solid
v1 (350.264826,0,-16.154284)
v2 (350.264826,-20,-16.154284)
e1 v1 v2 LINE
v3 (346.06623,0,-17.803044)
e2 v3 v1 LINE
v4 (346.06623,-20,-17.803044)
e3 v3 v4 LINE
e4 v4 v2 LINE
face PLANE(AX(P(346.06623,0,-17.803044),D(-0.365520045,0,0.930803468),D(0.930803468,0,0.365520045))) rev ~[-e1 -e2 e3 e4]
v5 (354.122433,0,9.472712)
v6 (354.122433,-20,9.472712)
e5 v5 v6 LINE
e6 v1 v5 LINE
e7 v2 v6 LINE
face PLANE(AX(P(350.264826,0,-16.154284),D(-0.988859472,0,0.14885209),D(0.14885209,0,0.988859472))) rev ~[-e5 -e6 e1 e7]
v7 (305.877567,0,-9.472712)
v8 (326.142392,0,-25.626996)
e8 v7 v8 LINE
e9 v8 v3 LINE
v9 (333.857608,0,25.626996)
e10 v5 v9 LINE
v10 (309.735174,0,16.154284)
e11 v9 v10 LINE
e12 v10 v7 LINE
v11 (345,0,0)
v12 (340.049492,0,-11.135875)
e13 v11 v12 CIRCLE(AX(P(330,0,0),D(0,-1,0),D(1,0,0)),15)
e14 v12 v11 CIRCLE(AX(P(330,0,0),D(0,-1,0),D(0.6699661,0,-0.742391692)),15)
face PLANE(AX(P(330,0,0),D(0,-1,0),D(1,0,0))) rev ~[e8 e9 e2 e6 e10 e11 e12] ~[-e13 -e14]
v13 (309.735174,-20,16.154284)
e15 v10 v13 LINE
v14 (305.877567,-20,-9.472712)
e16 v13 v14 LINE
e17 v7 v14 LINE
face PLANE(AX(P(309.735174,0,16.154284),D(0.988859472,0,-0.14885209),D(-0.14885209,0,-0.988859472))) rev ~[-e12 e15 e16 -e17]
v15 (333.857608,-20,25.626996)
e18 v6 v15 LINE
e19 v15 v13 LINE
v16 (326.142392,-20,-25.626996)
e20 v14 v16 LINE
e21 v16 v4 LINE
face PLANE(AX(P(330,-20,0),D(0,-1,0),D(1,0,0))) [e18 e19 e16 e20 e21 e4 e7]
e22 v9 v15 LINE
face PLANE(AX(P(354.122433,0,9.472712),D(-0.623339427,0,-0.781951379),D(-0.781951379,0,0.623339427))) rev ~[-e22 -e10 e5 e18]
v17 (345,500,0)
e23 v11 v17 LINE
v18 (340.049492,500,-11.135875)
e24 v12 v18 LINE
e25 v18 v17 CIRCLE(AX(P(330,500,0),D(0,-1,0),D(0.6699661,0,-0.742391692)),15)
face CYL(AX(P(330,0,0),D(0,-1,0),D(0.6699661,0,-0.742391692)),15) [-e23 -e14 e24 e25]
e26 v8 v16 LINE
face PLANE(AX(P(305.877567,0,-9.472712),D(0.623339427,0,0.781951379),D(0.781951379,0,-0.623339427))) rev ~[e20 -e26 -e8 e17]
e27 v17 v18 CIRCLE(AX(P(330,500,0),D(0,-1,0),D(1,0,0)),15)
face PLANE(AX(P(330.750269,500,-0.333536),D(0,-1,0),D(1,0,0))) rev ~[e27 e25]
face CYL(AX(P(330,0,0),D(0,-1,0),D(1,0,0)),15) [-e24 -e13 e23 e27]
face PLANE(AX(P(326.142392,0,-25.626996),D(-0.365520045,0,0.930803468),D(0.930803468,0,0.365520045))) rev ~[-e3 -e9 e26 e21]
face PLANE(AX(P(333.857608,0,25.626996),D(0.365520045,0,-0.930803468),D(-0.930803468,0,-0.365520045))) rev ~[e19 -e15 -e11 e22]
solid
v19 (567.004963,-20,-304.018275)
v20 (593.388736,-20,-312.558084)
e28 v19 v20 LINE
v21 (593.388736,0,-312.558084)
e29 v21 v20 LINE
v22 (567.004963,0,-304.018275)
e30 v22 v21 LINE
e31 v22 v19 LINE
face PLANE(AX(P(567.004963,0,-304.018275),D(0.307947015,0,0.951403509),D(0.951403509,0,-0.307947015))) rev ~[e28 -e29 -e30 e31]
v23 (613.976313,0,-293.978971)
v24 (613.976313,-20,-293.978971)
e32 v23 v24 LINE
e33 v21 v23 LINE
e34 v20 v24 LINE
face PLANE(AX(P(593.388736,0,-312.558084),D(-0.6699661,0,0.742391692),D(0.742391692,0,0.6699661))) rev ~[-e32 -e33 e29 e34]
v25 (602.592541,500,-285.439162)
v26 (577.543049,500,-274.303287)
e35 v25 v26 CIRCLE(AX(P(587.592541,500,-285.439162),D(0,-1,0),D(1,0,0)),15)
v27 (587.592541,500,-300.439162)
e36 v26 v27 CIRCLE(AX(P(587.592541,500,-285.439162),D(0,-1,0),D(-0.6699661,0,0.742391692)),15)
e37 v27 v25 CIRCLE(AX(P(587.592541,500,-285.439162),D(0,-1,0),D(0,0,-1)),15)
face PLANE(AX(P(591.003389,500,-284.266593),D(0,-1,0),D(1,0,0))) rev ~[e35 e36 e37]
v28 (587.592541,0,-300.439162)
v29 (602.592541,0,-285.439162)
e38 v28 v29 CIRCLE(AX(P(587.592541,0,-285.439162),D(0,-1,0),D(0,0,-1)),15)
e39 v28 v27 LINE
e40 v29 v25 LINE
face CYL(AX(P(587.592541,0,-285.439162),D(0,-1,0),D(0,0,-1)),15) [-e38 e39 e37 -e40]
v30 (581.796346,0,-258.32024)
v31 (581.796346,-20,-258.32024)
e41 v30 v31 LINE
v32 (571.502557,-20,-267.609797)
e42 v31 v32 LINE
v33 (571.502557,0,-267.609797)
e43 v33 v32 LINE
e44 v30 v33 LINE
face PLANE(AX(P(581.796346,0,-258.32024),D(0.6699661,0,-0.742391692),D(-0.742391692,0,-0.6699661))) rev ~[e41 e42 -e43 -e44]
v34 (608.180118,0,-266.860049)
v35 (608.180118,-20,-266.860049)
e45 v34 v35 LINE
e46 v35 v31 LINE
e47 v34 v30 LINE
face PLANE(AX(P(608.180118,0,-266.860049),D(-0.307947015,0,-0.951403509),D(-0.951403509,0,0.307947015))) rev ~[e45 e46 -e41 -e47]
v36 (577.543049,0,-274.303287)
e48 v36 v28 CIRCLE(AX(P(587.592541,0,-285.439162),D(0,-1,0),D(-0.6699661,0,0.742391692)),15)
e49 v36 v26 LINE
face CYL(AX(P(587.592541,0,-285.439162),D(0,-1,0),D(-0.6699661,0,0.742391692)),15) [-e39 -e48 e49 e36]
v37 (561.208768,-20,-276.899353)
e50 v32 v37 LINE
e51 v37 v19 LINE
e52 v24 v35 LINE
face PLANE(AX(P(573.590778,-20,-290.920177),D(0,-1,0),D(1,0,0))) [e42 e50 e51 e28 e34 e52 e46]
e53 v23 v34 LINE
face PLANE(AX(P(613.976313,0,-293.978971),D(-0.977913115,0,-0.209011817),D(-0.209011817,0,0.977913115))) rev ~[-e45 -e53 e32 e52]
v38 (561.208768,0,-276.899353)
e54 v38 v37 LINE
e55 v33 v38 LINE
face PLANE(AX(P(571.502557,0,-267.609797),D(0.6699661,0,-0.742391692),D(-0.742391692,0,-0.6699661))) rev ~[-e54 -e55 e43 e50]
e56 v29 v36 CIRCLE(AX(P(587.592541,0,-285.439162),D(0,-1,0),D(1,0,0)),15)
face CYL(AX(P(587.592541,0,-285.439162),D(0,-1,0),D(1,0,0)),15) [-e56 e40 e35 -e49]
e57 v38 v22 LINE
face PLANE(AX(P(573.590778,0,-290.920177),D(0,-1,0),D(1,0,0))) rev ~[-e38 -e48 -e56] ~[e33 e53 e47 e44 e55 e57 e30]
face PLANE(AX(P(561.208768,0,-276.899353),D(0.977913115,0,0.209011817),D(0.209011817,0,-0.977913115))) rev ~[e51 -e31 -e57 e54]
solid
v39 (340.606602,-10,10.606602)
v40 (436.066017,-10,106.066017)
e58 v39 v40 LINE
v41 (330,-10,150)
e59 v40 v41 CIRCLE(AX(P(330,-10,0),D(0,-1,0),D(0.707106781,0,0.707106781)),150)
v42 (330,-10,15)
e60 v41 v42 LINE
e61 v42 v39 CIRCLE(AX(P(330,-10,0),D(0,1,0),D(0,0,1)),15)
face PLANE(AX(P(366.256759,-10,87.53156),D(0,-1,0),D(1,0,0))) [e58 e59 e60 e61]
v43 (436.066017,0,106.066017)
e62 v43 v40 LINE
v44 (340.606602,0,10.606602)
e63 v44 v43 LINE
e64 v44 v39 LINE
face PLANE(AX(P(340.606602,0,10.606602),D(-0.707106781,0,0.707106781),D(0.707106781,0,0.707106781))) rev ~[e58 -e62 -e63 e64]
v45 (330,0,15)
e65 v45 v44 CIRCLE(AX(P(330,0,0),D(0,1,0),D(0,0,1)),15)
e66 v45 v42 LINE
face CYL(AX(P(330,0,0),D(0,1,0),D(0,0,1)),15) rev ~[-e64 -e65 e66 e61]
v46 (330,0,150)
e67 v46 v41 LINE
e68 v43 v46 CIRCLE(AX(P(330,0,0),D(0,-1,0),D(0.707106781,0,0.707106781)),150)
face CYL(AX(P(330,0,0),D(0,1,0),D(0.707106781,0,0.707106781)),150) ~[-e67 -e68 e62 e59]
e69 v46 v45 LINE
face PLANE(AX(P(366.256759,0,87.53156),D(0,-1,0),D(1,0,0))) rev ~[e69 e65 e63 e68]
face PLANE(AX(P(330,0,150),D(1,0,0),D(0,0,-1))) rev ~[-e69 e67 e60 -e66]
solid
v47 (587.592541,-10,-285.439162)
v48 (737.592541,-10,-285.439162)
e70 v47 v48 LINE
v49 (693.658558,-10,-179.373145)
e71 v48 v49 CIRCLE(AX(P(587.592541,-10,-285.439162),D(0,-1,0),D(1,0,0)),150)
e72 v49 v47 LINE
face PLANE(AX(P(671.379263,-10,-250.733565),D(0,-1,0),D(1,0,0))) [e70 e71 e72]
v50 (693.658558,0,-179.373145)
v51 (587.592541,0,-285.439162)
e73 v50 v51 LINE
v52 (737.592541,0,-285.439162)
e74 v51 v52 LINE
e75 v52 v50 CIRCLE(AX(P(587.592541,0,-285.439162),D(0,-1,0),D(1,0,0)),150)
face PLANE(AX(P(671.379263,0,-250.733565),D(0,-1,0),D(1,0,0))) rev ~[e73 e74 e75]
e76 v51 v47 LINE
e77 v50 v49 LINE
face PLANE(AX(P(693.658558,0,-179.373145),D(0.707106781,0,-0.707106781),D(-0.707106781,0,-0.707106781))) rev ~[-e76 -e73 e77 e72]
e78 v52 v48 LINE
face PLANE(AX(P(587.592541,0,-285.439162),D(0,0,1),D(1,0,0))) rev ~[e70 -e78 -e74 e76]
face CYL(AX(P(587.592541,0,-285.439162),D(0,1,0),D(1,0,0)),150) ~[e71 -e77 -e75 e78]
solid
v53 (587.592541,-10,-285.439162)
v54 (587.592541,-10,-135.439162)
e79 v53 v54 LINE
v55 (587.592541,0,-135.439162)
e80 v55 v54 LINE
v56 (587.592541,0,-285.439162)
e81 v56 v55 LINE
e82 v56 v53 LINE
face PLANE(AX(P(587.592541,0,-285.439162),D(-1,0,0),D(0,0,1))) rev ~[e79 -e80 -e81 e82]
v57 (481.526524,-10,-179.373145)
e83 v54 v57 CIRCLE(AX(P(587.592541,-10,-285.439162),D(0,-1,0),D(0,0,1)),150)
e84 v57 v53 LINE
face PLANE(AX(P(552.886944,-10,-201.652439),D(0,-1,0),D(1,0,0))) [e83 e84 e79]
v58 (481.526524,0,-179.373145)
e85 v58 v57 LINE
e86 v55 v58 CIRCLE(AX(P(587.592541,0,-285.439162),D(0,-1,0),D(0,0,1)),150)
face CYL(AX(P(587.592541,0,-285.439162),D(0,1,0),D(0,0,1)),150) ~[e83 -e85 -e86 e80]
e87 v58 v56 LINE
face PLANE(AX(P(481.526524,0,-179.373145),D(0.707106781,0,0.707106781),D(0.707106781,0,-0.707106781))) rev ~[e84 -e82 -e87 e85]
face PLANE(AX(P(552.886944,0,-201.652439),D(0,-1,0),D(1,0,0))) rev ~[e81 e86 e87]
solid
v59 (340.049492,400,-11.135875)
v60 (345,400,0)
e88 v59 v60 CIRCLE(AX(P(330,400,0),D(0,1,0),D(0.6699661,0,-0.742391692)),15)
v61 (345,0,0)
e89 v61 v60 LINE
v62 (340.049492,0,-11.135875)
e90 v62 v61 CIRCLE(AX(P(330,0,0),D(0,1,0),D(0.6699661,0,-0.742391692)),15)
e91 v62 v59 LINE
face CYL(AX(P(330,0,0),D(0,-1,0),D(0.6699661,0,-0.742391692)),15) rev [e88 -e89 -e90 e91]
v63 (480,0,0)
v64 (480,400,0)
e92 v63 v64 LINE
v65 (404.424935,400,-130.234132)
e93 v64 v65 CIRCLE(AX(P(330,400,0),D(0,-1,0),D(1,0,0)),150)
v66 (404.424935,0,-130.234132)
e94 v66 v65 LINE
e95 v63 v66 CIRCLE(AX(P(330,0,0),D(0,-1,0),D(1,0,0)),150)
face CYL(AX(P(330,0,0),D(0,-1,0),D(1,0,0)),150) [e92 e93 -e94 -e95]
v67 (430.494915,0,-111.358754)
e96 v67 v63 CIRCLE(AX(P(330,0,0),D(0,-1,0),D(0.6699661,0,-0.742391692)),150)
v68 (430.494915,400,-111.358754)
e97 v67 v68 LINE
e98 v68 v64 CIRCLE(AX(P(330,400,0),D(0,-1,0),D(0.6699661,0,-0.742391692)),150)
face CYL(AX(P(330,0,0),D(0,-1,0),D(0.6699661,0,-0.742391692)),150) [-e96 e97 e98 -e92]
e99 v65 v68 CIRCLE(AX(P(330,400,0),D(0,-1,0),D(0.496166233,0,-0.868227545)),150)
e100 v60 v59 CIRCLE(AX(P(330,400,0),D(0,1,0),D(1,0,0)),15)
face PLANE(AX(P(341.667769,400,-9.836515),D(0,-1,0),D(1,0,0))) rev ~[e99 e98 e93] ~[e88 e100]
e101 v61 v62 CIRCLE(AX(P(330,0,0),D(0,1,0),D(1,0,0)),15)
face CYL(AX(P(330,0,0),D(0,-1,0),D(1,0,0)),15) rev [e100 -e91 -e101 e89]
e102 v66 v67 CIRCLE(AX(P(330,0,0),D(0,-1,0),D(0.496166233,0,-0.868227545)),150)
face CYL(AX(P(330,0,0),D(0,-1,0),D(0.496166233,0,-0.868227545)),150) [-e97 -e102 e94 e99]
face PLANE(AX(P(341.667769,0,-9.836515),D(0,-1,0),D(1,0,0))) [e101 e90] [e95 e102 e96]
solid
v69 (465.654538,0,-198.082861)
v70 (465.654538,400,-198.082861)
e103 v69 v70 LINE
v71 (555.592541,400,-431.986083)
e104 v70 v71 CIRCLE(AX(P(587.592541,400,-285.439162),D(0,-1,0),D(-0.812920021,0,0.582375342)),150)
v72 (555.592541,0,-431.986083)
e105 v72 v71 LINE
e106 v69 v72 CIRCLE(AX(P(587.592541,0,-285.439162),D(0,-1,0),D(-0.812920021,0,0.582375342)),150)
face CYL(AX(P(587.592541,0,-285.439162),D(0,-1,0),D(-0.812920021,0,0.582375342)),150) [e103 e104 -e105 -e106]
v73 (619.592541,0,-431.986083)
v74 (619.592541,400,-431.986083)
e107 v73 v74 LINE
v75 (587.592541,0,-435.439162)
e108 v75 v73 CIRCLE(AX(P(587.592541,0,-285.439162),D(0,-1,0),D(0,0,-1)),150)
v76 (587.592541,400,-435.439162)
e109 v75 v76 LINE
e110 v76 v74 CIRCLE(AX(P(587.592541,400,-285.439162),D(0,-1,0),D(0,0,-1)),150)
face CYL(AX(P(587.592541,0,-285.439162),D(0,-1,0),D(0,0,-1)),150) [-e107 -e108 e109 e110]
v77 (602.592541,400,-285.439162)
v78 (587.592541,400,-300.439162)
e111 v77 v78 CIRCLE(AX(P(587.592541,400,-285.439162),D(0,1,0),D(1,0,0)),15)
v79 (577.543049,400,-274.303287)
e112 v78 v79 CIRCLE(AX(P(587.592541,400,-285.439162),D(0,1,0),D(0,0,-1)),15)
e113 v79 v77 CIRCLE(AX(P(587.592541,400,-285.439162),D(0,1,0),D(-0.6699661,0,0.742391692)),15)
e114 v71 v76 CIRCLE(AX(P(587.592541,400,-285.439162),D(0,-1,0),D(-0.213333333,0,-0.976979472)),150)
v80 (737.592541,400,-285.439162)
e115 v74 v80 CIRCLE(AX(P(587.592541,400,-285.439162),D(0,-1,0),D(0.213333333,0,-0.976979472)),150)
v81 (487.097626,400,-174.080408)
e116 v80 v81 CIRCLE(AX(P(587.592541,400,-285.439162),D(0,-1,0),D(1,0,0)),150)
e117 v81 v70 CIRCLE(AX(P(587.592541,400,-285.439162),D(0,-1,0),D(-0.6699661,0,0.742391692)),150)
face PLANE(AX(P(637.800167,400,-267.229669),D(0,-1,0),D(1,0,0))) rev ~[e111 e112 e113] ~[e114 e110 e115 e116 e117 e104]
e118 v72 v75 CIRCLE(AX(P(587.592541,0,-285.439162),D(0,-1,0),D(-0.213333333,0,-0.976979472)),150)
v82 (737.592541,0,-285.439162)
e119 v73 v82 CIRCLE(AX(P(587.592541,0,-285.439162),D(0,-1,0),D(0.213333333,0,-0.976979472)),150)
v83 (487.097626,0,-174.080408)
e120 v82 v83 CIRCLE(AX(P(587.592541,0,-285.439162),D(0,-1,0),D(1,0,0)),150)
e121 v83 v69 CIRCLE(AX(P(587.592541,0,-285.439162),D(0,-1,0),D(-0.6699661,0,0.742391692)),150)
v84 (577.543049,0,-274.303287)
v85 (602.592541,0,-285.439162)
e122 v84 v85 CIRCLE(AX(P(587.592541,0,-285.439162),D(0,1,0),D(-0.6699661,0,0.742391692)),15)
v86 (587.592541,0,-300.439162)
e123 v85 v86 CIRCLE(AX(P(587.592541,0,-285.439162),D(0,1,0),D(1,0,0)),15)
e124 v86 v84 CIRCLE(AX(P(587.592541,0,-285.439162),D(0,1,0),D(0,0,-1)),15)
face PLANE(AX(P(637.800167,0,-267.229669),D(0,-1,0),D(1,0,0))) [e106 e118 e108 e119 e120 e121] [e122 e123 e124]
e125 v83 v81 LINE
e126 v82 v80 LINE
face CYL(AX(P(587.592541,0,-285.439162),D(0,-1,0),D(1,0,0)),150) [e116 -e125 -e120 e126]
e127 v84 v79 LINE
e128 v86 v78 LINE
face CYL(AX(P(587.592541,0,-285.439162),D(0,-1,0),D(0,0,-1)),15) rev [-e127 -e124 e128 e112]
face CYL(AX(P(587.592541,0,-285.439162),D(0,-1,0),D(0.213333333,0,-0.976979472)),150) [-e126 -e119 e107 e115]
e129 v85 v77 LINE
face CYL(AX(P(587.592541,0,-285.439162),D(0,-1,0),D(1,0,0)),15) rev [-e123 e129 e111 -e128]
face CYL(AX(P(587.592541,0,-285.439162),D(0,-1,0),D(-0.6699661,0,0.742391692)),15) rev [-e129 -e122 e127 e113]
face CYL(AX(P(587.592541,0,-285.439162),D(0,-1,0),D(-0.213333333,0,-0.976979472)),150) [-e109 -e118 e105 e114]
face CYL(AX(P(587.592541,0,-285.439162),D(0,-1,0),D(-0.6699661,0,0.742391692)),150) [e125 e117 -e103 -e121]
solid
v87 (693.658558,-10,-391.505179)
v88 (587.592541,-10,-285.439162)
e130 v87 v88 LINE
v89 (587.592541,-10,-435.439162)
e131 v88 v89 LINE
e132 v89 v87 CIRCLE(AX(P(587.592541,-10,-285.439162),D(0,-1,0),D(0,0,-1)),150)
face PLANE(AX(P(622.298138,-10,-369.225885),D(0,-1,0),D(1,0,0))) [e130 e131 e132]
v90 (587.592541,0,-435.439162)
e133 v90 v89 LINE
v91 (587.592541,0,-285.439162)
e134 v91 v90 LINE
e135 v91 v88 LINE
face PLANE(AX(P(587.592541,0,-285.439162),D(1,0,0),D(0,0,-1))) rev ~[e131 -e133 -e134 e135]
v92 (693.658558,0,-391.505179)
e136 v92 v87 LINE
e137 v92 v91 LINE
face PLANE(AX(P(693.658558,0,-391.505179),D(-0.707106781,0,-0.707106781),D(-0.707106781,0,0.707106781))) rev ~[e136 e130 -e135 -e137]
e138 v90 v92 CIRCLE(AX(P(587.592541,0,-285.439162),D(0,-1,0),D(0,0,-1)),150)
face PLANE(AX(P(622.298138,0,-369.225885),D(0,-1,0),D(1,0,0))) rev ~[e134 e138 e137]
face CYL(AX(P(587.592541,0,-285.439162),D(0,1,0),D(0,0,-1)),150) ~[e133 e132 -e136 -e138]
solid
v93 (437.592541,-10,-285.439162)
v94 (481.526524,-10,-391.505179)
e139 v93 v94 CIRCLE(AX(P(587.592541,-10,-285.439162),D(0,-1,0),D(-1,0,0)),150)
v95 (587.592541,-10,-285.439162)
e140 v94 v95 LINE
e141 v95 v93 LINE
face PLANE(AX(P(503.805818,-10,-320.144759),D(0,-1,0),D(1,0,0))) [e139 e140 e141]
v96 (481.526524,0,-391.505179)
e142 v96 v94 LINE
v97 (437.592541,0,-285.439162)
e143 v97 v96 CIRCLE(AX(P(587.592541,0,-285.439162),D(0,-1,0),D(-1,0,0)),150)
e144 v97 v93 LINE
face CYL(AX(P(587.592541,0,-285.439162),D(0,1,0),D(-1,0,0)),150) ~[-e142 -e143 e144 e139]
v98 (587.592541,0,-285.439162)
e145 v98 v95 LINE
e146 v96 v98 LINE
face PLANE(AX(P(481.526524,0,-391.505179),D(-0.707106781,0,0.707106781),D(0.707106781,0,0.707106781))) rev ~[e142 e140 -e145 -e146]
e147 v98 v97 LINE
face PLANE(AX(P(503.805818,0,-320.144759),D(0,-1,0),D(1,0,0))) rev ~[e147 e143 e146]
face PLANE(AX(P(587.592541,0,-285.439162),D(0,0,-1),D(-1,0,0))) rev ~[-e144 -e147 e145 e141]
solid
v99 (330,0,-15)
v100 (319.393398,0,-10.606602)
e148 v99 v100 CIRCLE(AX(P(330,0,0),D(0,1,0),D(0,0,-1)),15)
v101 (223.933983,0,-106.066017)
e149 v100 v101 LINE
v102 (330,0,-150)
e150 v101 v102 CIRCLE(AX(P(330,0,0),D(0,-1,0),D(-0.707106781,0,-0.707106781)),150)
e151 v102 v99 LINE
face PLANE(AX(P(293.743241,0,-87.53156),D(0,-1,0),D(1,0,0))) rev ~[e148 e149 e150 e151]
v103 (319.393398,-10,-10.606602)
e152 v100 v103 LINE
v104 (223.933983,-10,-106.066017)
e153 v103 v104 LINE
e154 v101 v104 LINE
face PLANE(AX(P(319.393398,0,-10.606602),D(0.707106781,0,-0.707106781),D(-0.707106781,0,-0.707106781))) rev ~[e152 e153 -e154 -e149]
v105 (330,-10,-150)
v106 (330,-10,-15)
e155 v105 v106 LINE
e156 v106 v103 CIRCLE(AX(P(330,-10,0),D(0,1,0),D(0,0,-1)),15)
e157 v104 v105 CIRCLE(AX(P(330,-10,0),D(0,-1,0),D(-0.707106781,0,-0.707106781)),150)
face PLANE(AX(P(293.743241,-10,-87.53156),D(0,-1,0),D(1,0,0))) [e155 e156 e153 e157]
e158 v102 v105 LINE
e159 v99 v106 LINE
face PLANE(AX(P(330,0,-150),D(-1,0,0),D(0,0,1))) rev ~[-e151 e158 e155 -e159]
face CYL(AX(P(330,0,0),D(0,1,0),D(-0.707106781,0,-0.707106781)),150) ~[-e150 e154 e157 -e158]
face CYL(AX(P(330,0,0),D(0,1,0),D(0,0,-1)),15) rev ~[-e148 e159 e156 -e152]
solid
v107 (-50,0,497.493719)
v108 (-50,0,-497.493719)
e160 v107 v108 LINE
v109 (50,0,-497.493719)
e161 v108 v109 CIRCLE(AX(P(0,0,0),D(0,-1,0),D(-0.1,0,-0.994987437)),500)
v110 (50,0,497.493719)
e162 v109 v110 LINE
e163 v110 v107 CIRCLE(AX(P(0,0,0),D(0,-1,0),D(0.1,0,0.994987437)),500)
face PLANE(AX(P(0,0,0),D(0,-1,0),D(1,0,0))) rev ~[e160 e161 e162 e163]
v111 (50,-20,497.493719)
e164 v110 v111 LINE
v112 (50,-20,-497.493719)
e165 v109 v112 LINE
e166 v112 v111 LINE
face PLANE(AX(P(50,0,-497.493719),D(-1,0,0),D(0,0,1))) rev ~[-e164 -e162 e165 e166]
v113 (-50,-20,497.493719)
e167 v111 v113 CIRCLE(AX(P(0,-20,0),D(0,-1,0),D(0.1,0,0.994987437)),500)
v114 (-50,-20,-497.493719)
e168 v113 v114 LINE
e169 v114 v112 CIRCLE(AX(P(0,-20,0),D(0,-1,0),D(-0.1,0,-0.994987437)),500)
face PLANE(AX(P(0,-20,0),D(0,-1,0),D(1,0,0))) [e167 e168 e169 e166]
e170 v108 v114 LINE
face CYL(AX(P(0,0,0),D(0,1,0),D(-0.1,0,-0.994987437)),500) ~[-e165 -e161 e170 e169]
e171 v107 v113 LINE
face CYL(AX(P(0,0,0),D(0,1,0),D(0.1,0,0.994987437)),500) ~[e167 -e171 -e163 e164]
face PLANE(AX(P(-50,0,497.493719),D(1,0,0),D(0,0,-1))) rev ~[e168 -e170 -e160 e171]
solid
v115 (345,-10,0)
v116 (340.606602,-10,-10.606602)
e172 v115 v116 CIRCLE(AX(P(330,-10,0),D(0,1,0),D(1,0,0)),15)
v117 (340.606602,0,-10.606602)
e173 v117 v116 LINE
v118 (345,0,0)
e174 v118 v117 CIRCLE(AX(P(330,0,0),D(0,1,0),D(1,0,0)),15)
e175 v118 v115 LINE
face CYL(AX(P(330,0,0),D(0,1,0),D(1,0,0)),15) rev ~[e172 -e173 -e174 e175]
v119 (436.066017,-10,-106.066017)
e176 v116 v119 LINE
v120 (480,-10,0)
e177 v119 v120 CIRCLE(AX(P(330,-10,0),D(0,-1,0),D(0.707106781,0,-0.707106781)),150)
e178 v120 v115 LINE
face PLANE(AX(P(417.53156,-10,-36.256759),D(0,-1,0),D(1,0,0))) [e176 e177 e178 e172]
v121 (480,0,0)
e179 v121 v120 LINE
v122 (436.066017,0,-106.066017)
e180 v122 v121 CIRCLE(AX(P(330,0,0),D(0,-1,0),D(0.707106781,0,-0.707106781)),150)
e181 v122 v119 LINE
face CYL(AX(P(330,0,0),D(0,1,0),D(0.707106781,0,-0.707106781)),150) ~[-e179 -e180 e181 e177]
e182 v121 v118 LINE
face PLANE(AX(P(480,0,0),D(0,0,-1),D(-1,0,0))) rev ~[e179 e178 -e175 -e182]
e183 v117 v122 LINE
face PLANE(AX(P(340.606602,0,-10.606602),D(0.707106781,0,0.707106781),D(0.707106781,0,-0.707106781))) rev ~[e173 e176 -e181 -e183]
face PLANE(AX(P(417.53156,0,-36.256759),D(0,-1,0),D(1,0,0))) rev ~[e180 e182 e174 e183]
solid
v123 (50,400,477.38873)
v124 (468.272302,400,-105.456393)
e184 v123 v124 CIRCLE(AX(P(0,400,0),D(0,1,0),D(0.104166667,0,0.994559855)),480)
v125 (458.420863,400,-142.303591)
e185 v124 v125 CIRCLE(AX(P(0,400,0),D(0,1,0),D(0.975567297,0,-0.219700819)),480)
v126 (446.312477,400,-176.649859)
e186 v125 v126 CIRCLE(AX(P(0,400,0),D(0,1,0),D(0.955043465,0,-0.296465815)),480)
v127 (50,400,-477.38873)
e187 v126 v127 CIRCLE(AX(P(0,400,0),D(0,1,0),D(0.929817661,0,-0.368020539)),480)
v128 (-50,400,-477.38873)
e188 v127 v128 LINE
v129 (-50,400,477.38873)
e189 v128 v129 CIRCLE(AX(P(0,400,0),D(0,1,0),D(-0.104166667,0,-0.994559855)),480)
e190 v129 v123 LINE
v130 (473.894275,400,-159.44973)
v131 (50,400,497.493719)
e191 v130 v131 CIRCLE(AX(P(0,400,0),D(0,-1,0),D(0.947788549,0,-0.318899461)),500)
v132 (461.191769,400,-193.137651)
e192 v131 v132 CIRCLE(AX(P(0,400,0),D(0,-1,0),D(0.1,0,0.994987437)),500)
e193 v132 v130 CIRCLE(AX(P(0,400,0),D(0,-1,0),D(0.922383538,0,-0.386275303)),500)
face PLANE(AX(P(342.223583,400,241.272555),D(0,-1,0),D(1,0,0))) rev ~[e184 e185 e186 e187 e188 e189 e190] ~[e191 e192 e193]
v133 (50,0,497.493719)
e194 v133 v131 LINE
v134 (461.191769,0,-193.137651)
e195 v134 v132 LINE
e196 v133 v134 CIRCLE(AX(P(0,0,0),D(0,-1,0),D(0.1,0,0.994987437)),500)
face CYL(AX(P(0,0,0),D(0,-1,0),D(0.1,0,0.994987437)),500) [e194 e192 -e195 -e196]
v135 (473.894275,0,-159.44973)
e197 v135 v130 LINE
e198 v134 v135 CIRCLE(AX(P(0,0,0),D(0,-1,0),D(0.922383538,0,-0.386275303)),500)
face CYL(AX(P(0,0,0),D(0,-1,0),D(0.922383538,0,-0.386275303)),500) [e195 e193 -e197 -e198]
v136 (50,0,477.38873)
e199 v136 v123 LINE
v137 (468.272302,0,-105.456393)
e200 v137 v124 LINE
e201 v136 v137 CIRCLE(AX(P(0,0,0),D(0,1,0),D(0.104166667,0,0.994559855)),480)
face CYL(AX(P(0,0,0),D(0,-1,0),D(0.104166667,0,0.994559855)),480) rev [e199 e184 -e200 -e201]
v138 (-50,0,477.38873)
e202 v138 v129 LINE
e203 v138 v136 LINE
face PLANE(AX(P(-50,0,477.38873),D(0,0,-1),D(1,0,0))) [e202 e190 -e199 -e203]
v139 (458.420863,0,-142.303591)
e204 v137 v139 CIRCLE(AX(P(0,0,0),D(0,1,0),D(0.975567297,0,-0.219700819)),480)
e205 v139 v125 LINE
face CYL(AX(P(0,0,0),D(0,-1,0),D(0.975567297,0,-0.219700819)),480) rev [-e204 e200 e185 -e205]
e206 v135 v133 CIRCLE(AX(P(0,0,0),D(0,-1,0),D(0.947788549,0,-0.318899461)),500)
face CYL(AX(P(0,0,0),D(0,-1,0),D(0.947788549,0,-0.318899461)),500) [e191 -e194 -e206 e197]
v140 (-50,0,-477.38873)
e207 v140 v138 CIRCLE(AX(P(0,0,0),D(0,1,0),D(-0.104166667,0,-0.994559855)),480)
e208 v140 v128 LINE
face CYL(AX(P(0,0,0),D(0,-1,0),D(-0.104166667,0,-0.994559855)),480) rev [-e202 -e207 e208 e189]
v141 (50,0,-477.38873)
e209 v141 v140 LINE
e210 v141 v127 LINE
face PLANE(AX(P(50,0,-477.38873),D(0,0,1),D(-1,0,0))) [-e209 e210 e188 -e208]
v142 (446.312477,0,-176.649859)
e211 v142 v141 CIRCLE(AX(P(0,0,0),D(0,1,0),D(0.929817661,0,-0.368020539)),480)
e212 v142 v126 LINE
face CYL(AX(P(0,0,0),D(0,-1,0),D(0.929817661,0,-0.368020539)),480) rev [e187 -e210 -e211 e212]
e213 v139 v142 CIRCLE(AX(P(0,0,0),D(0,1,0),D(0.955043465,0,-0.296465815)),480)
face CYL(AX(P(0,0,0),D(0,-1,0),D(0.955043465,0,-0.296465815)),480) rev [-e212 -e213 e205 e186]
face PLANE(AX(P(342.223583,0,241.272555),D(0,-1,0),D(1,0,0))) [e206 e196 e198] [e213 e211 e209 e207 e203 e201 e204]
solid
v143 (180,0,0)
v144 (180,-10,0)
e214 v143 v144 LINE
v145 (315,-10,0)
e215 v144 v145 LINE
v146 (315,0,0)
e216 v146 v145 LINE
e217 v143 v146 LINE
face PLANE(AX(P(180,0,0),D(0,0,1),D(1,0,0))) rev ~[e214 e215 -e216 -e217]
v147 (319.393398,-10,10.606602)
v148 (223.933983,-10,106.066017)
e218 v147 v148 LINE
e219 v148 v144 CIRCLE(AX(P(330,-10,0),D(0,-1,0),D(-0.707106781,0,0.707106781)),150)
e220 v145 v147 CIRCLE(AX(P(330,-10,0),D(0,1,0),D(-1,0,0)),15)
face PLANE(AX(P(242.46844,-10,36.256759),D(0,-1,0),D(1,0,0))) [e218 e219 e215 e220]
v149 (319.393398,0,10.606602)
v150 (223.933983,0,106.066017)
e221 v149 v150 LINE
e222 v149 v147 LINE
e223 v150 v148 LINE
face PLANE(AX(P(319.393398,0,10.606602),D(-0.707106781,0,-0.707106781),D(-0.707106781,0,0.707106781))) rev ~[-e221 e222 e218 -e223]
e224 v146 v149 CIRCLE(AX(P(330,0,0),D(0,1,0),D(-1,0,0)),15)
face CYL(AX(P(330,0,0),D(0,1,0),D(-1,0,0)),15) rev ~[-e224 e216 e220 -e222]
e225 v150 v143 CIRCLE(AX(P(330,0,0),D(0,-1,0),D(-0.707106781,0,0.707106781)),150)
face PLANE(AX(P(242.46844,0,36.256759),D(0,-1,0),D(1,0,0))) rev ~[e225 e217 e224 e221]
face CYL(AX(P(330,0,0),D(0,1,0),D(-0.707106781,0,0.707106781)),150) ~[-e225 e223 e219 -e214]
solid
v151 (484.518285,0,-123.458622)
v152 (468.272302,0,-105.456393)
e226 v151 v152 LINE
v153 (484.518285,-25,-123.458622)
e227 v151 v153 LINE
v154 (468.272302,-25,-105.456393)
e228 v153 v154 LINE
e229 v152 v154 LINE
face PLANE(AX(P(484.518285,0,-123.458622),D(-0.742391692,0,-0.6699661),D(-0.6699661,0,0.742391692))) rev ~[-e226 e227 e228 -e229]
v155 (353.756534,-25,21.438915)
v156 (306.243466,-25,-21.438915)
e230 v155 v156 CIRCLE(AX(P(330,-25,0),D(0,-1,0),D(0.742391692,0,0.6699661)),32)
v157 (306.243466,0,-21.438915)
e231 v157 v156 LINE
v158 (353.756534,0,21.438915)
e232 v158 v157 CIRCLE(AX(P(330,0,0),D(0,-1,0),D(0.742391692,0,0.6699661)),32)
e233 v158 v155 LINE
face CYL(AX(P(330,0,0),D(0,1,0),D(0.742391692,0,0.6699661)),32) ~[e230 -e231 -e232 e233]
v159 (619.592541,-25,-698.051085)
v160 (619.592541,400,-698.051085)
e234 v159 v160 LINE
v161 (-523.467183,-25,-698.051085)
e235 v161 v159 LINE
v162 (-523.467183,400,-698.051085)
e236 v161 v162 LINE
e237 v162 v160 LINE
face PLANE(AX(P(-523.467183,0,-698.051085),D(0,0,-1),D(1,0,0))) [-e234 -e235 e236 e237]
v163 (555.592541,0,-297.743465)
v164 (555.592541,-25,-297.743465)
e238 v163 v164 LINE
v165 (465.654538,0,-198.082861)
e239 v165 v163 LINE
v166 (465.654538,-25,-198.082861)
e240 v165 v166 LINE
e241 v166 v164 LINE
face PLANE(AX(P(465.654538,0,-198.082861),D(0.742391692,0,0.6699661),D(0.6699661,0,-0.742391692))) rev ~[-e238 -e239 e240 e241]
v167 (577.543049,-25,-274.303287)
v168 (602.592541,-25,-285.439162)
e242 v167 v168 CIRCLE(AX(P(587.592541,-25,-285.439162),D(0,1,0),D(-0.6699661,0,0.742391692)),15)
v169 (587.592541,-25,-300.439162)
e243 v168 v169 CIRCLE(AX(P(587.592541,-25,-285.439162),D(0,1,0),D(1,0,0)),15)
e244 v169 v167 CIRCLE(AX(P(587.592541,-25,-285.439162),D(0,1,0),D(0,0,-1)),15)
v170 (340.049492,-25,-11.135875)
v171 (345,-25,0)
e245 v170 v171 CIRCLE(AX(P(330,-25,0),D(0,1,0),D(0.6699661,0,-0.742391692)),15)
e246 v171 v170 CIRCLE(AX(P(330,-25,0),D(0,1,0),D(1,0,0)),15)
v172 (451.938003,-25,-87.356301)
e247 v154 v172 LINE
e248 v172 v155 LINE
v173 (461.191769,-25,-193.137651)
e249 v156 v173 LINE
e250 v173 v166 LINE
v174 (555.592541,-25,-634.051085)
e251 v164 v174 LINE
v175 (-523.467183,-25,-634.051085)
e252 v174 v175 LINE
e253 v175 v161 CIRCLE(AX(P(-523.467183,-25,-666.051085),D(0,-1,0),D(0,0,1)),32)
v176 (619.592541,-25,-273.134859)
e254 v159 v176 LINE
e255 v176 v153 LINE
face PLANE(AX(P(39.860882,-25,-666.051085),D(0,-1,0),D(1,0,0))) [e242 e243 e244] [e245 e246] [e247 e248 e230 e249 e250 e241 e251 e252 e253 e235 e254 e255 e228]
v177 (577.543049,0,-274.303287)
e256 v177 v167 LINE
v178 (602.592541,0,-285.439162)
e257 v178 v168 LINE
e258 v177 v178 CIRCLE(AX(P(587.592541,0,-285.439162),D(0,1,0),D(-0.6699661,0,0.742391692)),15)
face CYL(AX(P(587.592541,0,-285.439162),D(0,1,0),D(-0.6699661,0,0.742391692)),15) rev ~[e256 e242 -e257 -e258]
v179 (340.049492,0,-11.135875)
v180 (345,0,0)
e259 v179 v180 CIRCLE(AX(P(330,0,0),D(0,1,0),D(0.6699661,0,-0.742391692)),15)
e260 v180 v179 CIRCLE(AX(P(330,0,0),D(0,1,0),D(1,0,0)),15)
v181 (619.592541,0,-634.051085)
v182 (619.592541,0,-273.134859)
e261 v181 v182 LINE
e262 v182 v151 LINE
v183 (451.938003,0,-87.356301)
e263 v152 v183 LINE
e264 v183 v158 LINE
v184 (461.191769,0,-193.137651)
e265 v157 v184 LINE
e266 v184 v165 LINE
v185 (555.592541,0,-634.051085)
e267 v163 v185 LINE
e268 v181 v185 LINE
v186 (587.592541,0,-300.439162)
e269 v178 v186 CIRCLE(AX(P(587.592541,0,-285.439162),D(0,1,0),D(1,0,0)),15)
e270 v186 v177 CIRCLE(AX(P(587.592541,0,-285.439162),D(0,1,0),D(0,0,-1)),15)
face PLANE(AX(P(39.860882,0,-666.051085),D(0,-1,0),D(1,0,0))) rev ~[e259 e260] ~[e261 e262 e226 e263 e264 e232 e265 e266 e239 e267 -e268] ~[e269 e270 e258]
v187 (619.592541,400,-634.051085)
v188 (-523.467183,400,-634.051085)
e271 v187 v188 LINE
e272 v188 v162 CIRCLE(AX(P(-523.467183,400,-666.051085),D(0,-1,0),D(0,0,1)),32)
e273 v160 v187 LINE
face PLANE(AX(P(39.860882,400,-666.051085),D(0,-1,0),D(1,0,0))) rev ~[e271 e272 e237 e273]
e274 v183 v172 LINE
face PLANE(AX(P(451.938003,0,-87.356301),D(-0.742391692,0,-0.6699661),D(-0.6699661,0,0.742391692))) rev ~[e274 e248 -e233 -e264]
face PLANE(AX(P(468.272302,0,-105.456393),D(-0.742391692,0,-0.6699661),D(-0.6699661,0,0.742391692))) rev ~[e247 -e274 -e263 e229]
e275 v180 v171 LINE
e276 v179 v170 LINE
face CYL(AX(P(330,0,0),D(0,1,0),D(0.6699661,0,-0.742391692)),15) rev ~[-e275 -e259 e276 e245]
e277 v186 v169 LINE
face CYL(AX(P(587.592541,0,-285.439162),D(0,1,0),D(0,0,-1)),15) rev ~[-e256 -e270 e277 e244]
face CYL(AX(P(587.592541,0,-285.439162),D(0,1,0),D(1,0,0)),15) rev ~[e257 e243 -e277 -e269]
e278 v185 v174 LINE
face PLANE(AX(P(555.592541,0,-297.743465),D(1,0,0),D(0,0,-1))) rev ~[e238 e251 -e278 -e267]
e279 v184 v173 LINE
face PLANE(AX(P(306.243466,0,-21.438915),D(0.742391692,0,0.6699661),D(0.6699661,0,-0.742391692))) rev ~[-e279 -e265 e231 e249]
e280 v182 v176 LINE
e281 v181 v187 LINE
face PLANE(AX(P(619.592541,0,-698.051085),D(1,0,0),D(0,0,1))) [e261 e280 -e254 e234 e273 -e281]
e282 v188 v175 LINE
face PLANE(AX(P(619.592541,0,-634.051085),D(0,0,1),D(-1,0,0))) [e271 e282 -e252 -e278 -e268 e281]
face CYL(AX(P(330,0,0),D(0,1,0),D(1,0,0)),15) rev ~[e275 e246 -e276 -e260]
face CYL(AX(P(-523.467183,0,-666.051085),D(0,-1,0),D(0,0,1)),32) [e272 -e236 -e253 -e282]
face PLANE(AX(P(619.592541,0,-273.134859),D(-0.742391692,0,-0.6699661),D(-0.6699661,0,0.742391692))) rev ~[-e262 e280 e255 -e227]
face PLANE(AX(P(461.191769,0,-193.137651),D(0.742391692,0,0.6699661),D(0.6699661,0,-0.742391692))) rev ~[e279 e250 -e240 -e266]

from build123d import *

# Parameters (mm, degrees)
F1_DEPTH  = 25
F2_DEPTH  = 400
F3_DEPTH  = 20
F4_DEPTH  = 500
F5_DEPTH  = 500
F6_DEPTH  = 400
F7_DEPTH  = 400
F8_DEPTH  = 20
F10_DEPTH = 10


with BuildPart() as f1:
    # F0 (on Front) → F1 (new body)
    with BuildSketch(Plane.XZ):
        with BuildLine():
            Line((619.5925408203, -698.0510845184), (619.5925408203, -634.0510845184))
            Line((619.5925408203, -634.0510845184), (587.5925408203, -634.0510845184))
            Line((587.5925408203, -634.0510845184), (555.5925408203, -634.0510845184))
            Line((555.5925408203, -634.0510845184), (-523.4671831131, -634.0510845184))
            ThreePointArc((-523.4671831131, -634.0510845184), (-555.4671831131, -666.0510845184), (-523.4671831131, -698.0510845184))
            Line((-523.4671831131, -698.0510845184), (619.5925408203, -698.0510845184))
        make_face()
        with BuildLine():
            Line((571.5025570686, -267.6097967695), (487.0976257639, -174.0804081495))
            ThreePointArc((487.0976257639, -174.0804081495), (475.7304372594, -185.5048345789), (465.6545376167, -198.0828606612))
            Line((465.6545376167, -198.0828606612), (555.5925408203, -297.7434648854))
            Line((555.5925408203, -297.7434648854), (555.5925408203, -431.9860827629))
            ThreePointArc((555.5925408203, -431.9860827629), (571.4996560892, -434.5733936367), (587.5925408203, -435.4391619491))
            Line((587.5925408203, -435.4391619491), (587.5925408203, -310.6819911327))
            Line((587.5925408203, -310.6819911327), (567.0049632483, -304.0182748497))
            Line((567.0049632483, -304.0182748497), (561.2087682826, -276.8993532197))
            Line((561.2087682826, -276.8993532197), (571.5025570686, -267.6097967695))
        make_face()
        with BuildLine():
            Line((619.5925408203, -273.1348590129), (513.1676059045, -155.2050302371))
            ThreePointArc((513.1676059045, -155.2050302371), (499.6248851086, -163.9414601248), (487.0976257639, -174.0804081495))
            Line((487.0976257639, -174.0804081495), (571.5025570686, -267.6097967695))
            Line((571.5025570686, -267.6097967695), (581.7963458546, -258.3202403192))
            Line((581.7963458546, -258.3202403192), (608.1801183922, -266.8600490486))
            Line((608.1801183922, -266.8600490486), (613.9763133579, -293.9789706786))
            Line((613.9763133579, -293.9789706786), (593.388735786, -312.5580835791))
            Line((593.388735786, -312.5580835791), (587.5925408203, -310.6819911327))
            Line((587.5925408203, -310.6819911327), (587.5925408203, -435.4391619491))
            ThreePointArc((587.5925408203, -435.4391619491), (603.6854255513, -434.5733936367), (619.5925408203, -431.9860827629))
            Line((619.5925408203, -431.9860827629), (619.5925408203, -273.1348590129))
        make_face()
        with BuildLine():
            Line((487.0976257639, -174.0804081495), (473.8942746161, -159.4497302791))
            ThreePointArc((473.8942746161, -159.4497302791), (467.8463381744, -176.4080606343), (461.1917687716, -193.1376514751))
            Line((461.1917687716, -193.1376514751), (465.6545376167, -198.0828606612))
            ThreePointArc((465.6545376167, -198.0828606612), (475.7304372594, -185.5048345789), (487.0976257639, -174.0804081495))
        make_face()
        with BuildLine():
            ThreePointArc((461.1917687716, -193.1376514751), (467.8463381744, -176.4080606343), (473.8942746161, -159.4497302791))
            Line((473.8942746161, -159.4497302791), (458.4208633436, -142.3035911399))
            ThreePointArc((458.4208633436, -142.3035911399), (452.692523658, -159.5916007319), (446.3124773798, -176.6498585765))
            Line((446.3124773798, -176.6498585765), (461.1917687716, -193.1376514751))
        make_face()
        with BuildLine():
            ThreePointArc((446.3124773798, -176.6498585765), (452.692523658, -159.5916007319), (458.4208633436, -142.3035911399))
            Line((458.4208633436, -142.3035911399), (430.4949150564, -111.3587537997))
            ThreePointArc((430.4949150564, -111.3587537997), (417.9676557116, -121.4977018244), (404.4249349157, -130.234131712))
            Line((404.4249349157, -130.234131712), (446.3124773798, -176.6498585765))
        make_face()
        with BuildLine():
            ThreePointArc((458.4208633436, -142.3035911399), (463.7127179959, -123.9778817726), (468.272302341, -105.4563931693))
            Line((468.272302341, -105.4563931693), (451.9380032036, -87.356301288))
            ThreePointArc((451.9380032036, -87.356301288), (441.8621035608, -99.9343273703), (430.4949150564, -111.3587537997))
            Line((430.4949150564, -111.3587537997), (458.4208633436, -142.3035911399))
        make_face()
        with BuildLine():
            ThreePointArc((430.4949150564, -111.3587537997), (441.8621035608, -99.9343273703), (451.9380032036, -87.356301288))
            Line((451.9380032036, -87.356301288), (353.7565341439, 21.438915212))
            ThreePointArc((353.7565341439, 21.438915212), (308.561084788, 23.7565341439), (306.2434658561, -21.438915212))
            Line((306.2434658561, -21.438915212), (404.4249349157, -130.234131712))
            ThreePointArc((404.4249349157, -130.234131712), (417.9676557116, -121.4977018244), (430.4949150564, -111.3587537997))
        make_face()
        Polygon((350.264825672, -16.1542842363), (346.0662299812, -17.8030435466), (326.1423923074, -25.6269959534), (305.8775666354, -9.4727117171), (309.735174328, 16.1542842363), (333.8576076926, 25.6269959534), (354.1224333646, 9.4727117171), align=None, mode=Mode.SUBTRACT)
        with BuildLine():
            ThreePointArc((473.8942746161, -159.4497302791), (479.5440529439, -141.553881212), (484.5182852707, -123.4586215636))
            Line((484.5182852707, -123.4586215636), (468.272302341, -105.4563931693))
            ThreePointArc((468.272302341, -105.4563931693), (463.7127179959, -123.9778817726), (458.4208633436, -142.3035911399))
            Line((458.4208633436, -142.3035911399), (473.8942746161, -159.4497302791))
        make_face()
        with BuildLine():
            Line((513.1676059045, -155.2050302371), (484.5182852707, -123.4586215636))
            ThreePointArc((484.5182852707, -123.4586215636), (479.5440529439, -141.553881212), (473.8942746161, -159.4497302791))
            Line((473.8942746161, -159.4497302791), (487.0976257639, -174.0804081495))
            ThreePointArc((487.0976257639, -174.0804081495), (499.6248851086, -163.9414601248), (513.1676059045, -155.2050302371))
        make_face()
        with BuildLine():
            Line((577.5430493146, -274.3032865692), (571.5025570686, -267.6097967695))
            Line((571.5025570686, -267.6097967695), (561.2087682826, -276.8993532197))
            Line((561.2087682826, -276.8993532197), (567.0049632483, -304.0182748497))
            Line((567.0049632483, -304.0182748497), (587.5925408203, -310.6819911327))
            Line((587.5925408203, -310.6819911327), (587.5925408203, -300.4391619491))
            ThreePointArc((587.5925408203, -300.4391619491), (573.5918599315, -290.822556292), (577.5430493146, -274.3032865692))
        make_face()
        with BuildLine():
            Line((581.7963458546, -258.3202403192), (571.5025570686, -267.6097967695))
            Line((571.5025570686, -267.6097967695), (577.5430493146, -274.3032865692))
            ThreePointArc((577.5430493146, -274.3032865692), (593.6858825724, -271.7325509058), (602.5925408203, -285.4391619491))
            ThreePointArc((602.5925408203, -285.4391619491), (598.1991425381, -296.0457636669), (587.5925408203, -300.4391619491))
            Line((587.5925408203, -300.4391619491), (587.5925408203, -310.6819911327))
            Line((587.5925408203, -310.6819911327), (593.388735786, -312.5580835791))
            Line((593.388735786, -312.5580835791), (613.9763133579, -293.9789706786))
            Line((613.9763133579, -293.9789706786), (608.1801183922, -266.8600490486))
            Line((608.1801183922, -266.8600490486), (581.7963458546, -258.3202403192))
        make_face()
        Polygon((326.1423923074, -25.6269959534), (346.0662299812, -17.8030435466), (350.264825672, -16.1542842363), (354.1224333646, 9.4727117171), (333.8576076926, 25.6269959534), (309.735174328, 16.1542842363), (305.8775666354, -9.4727117171), align=None)
        with BuildLine():
            ThreePointArc((345, 0), (343.7066110433, -6.0933417521), (340.0494915056, -11.13587538))
            ThreePointArc((340.0494915056, -11.13587538), (316.2933889567, 6.0933417521), (345, 0))
        make_face(mode=Mode.SUBTRACT)
        with BuildLine():
            ThreePointArc((587.5925408203, -435.4391619491), (571.4996560892, -434.5733936367), (555.5925408203, -431.9860827629))
            Line((555.5925408203, -431.9860827629), (555.5925408203, -634.0510845184))
            Line((555.5925408203, -634.0510845184), (587.5925408203, -634.0510845184))
            Line((587.5925408203, -634.0510845184), (587.5925408203, -435.4391619491))
        make_face()
        with BuildLine():
            Line((619.5925408203, -634.0510845184), (619.5925408203, -431.9860827629))
            ThreePointArc((619.5925408203, -431.9860827629), (603.6854255513, -434.5733936367), (587.5925408203, -435.4391619491))
            Line((587.5925408203, -435.4391619491), (587.5925408203, -634.0510845184))
            Line((587.5925408203, -634.0510845184), (619.5925408203, -634.0510845184))
        make_face()
    extrude(amount=F1_DEPTH)

    # F0 (on Front) → F2 (join)
    with BuildSketch(Plane.XZ):
        with BuildLine():
            Line((619.5925408203, -698.0510845184), (619.5925408203, -634.0510845184))
            Line((619.5925408203, -634.0510845184), (587.5925408203, -634.0510845184))
            Line((587.5925408203, -634.0510845184), (555.5925408203, -634.0510845184))
            Line((555.5925408203, -634.0510845184), (-523.4671831131, -634.0510845184))
            ThreePointArc((-523.4671831131, -634.0510845184), (-555.4671831131, -666.0510845184), (-523.4671831131, -698.0510845184))
            Line((-523.4671831131, -698.0510845184), (619.5925408203, -698.0510845184))
        make_face()
    extrude(amount=-F2_DEPTH)


with BuildPart() as f3:
    # F0 (on Front) → F3 (new body)
    with BuildSketch(Plane.XZ):
        Polygon((326.1423923074, -25.6269959534), (346.0662299812, -17.8030435466), (350.264825672, -16.1542842363), (354.1224333646, 9.4727117171), (333.8576076926, 25.6269959534), (309.735174328, 16.1542842363), (305.8775666354, -9.4727117171), align=None)
        with BuildLine():
            ThreePointArc((345, 0), (343.7066110433, -6.0933417521), (340.0494915056, -11.13587538))
            ThreePointArc((340.0494915056, -11.13587538), (316.2933889567, 6.0933417521), (345, 0))
        make_face(mode=Mode.SUBTRACT)
        with BuildLine():
            ThreePointArc((345, 0), (316.2933889567, 6.0933417521), (340.0494915056, -11.13587538))
            ThreePointArc((340.0494915056, -11.13587538), (343.7066110433, -6.0933417521), (345, 0))
        make_face()
    extrude(amount=F3_DEPTH)

    # F0 (on Front) → F4 (join)
    with BuildSketch(Plane.XZ):
        with BuildLine():
            ThreePointArc((345, 0), (316.2933889567, 6.0933417521), (340.0494915056, -11.13587538))
            ThreePointArc((340.0494915056, -11.13587538), (343.7066110433, -6.0933417521), (345, 0))
        make_face()
    extrude(amount=-F4_DEPTH)


with BuildPart() as f3b:
    # F0 (on Front) → F3, piece 2 (new body)
    with BuildSketch(Plane.XZ):
        with BuildLine():
            Line((577.5430493146, -274.3032865692), (571.5025570686, -267.6097967695))
            Line((571.5025570686, -267.6097967695), (561.2087682826, -276.8993532197))
            Line((561.2087682826, -276.8993532197), (567.0049632483, -304.0182748497))
            Line((567.0049632483, -304.0182748497), (587.5925408203, -310.6819911327))
            Line((587.5925408203, -310.6819911327), (587.5925408203, -300.4391619491))
            ThreePointArc((587.5925408203, -300.4391619491), (573.5918599315, -290.822556292), (577.5430493146, -274.3032865692))
        make_face()
        with BuildLine():
            Line((581.7963458546, -258.3202403192), (571.5025570686, -267.6097967695))
            Line((571.5025570686, -267.6097967695), (577.5430493146, -274.3032865692))
            ThreePointArc((577.5430493146, -274.3032865692), (593.6858825724, -271.7325509058), (602.5925408203, -285.4391619491))
            ThreePointArc((602.5925408203, -285.4391619491), (598.1991425381, -296.0457636669), (587.5925408203, -300.4391619491))
            Line((587.5925408203, -300.4391619491), (587.5925408203, -310.6819911327))
            Line((587.5925408203, -310.6819911327), (593.388735786, -312.5580835791))
            Line((593.388735786, -312.5580835791), (613.9763133579, -293.9789706786))
            Line((613.9763133579, -293.9789706786), (608.1801183922, -266.8600490486))
            Line((608.1801183922, -266.8600490486), (581.7963458546, -258.3202403192))
        make_face()
        with BuildLine():
            ThreePointArc((602.5925408203, -285.4391619491), (593.6858825724, -271.7325509058), (577.5430493146, -274.3032865692))
            Line((577.5430493146, -274.3032865692), (587.5925408203, -285.4391619491))
            Line((587.5925408203, -285.4391619491), (587.5925408203, -300.4391619491))
            ThreePointArc((587.5925408203, -300.4391619491), (598.1991425381, -296.0457636669), (602.5925408203, -285.4391619491))
        make_face()
        with BuildLine():
            Line((587.5925408203, -285.4391619491), (577.5430493146, -274.3032865692))
            ThreePointArc((577.5430493146, -274.3032865692), (573.5918599315, -290.822556292), (587.5925408203, -300.4391619491))
            Line((587.5925408203, -300.4391619491), (587.5925408203, -285.4391619491))
        make_face()
    extrude(amount=F3_DEPTH)

    # F0 (on Front) → F5 (join)
    with BuildSketch(Plane.XZ):
        with BuildLine():
            ThreePointArc((602.5925408203, -285.4391619491), (593.6858825724, -271.7325509058), (577.5430493146, -274.3032865692))
            Line((577.5430493146, -274.3032865692), (587.5925408203, -285.4391619491))
            Line((587.5925408203, -285.4391619491), (587.5925408203, -300.4391619491))
            ThreePointArc((587.5925408203, -300.4391619491), (598.1991425381, -296.0457636669), (602.5925408203, -285.4391619491))
        make_face()
        with BuildLine():
            Line((587.5925408203, -285.4391619491), (577.5430493146, -274.3032865692))
            ThreePointArc((577.5430493146, -274.3032865692), (573.5918599315, -290.822556292), (587.5925408203, -300.4391619491))
            Line((587.5925408203, -300.4391619491), (587.5925408203, -285.4391619491))
        make_face()
    extrude(amount=-F5_DEPTH)


with BuildPart() as f6:
    # F0 (on Front) → F6 (new body)
    with BuildSketch(Plane.XZ):
        with BuildLine():
            ThreePointArc((737.5925408203, -285.4391619491), (662.879524299, -155.7014645799), (513.1676059045, -155.2050302371))
            Line((513.1676059045, -155.2050302371), (619.5925408203, -273.1348590129))
            Line((619.5925408203, -273.1348590129), (619.5925408203, -431.9860827629))
            ThreePointArc((619.5925408203, -431.9860827629), (704.4257552757, -379.5136005603), (737.5925408203, -285.4391619491))
        make_face()
        with BuildLine():
            Line((619.5925408203, -273.1348590129), (513.1676059045, -155.2050302371))
            ThreePointArc((513.1676059045, -155.2050302371), (499.6248851086, -163.9414601248), (487.0976257639, -174.0804081495))
            Line((487.0976257639, -174.0804081495), (571.5025570686, -267.6097967695))
            Line((571.5025570686, -267.6097967695), (581.7963458546, -258.3202403192))
            Line((581.7963458546, -258.3202403192), (608.1801183922, -266.8600490486))
            Line((608.1801183922, -266.8600490486), (613.9763133579, -293.9789706786))
            Line((613.9763133579, -293.9789706786), (593.388735786, -312.5580835791))
            Line((593.388735786, -312.5580835791), (587.5925408203, -310.6819911327))
            Line((587.5925408203, -310.6819911327), (587.5925408203, -435.4391619491))
            ThreePointArc((587.5925408203, -435.4391619491), (603.6854255513, -434.5733936367), (619.5925408203, -431.9860827629))
            Line((619.5925408203, -431.9860827629), (619.5925408203, -273.1348590129))
        make_face()
        with BuildLine():
            Line((571.5025570686, -267.6097967695), (487.0976257639, -174.0804081495))
            ThreePointArc((487.0976257639, -174.0804081495), (475.7304372594, -185.5048345789), (465.6545376167, -198.0828606612))
            Line((465.6545376167, -198.0828606612), (555.5925408203, -297.7434648854))
            Line((555.5925408203, -297.7434648854), (555.5925408203, -431.9860827629))
            ThreePointArc((555.5925408203, -431.9860827629), (571.4996560892, -434.5733936367), (587.5925408203, -435.4391619491))
            Line((587.5925408203, -435.4391619491), (587.5925408203, -310.6819911327))
            Line((587.5925408203, -310.6819911327), (567.0049632483, -304.0182748497))
            Line((567.0049632483, -304.0182748497), (561.2087682826, -276.8993532197))
            Line((561.2087682826, -276.8993532197), (571.5025570686, -267.6097967695))
        make_face()
        with BuildLine():
            Line((555.5925408203, -297.7434648854), (465.6545376167, -198.0828606612))
            ThreePointArc((465.6545376167, -198.0828606612), (447.5857319324, -339.2731053773), (555.5925408203, -431.9860827629))
            Line((555.5925408203, -431.9860827629), (555.5925408203, -297.7434648854))
        make_face()
        with BuildLine():
            Line((577.5430493146, -274.3032865692), (571.5025570686, -267.6097967695))
            Line((571.5025570686, -267.6097967695), (561.2087682826, -276.8993532197))
            Line((561.2087682826, -276.8993532197), (567.0049632483, -304.0182748497))
            Line((567.0049632483, -304.0182748497), (587.5925408203, -310.6819911327))
            Line((587.5925408203, -310.6819911327), (587.5925408203, -300.4391619491))
            ThreePointArc((587.5925408203, -300.4391619491), (573.5918599315, -290.822556292), (577.5430493146, -274.3032865692))
        make_face()
        with BuildLine():
            Line((581.7963458546, -258.3202403192), (571.5025570686, -267.6097967695))
            Line((571.5025570686, -267.6097967695), (577.5430493146, -274.3032865692))
            ThreePointArc((577.5430493146, -274.3032865692), (593.6858825724, -271.7325509058), (602.5925408203, -285.4391619491))
            ThreePointArc((602.5925408203, -285.4391619491), (598.1991425381, -296.0457636669), (587.5925408203, -300.4391619491))
            Line((587.5925408203, -300.4391619491), (587.5925408203, -310.6819911327))
            Line((587.5925408203, -310.6819911327), (593.388735786, -312.5580835791))
            Line((593.388735786, -312.5580835791), (613.9763133579, -293.9789706786))
            Line((613.9763133579, -293.9789706786), (608.1801183922, -266.8600490486))
            Line((608.1801183922, -266.8600490486), (581.7963458546, -258.3202403192))
        make_face()
    extrude(amount=-F6_DEPTH)


with BuildPart() as f6b:
    # F0 (on Front) → F6, piece 2 (new body)
    with BuildSketch(Plane.XZ):
        with BuildLine():
            ThreePointArc((451.9380032036, -87.356301288), (472.8122902284, -45.8764619356), (480, 0))
            ThreePointArc((480, 0), (200.2623026307, 75.2869834787), (404.4249349157, -130.234131712))
            Line((404.4249349157, -130.234131712), (306.2434658561, -21.438915212))
            ThreePointArc((306.2434658561, -21.438915212), (308.561084788, 23.7565341439), (353.7565341439, 21.438915212))
            Line((353.7565341439, 21.438915212), (451.9380032036, -87.356301288))
        make_face()
        with BuildLine():
            ThreePointArc((430.4949150564, -111.3587537997), (441.8621035608, -99.9343273703), (451.9380032036, -87.356301288))
            Line((451.9380032036, -87.356301288), (353.7565341439, 21.438915212))
            ThreePointArc((353.7565341439, 21.438915212), (308.561084788, 23.7565341439), (306.2434658561, -21.438915212))
            Line((306.2434658561, -21.438915212), (404.4249349157, -130.234131712))
            ThreePointArc((404.4249349157, -130.234131712), (417.9676557116, -121.4977018244), (430.4949150564, -111.3587537997))
        make_face()
        Polygon((350.264825672, -16.1542842363), (346.0662299812, -17.8030435466), (326.1423923074, -25.6269959534), (305.8775666354, -9.4727117171), (309.735174328, 16.1542842363), (333.8576076926, 25.6269959534), (354.1224333646, 9.4727117171), align=None, mode=Mode.SUBTRACT)
        Polygon((326.1423923074, -25.6269959534), (346.0662299812, -17.8030435466), (350.264825672, -16.1542842363), (354.1224333646, 9.4727117171), (333.8576076926, 25.6269959534), (309.735174328, 16.1542842363), (305.8775666354, -9.4727117171), align=None)
        with BuildLine():
            ThreePointArc((345, 0), (343.7066110433, -6.0933417521), (340.0494915056, -11.13587538))
            ThreePointArc((340.0494915056, -11.13587538), (316.2933889567, 6.0933417521), (345, 0))
        make_face(mode=Mode.SUBTRACT)
    extrude(amount=-F6_DEPTH)


with BuildPart() as f7:
    # F0 (on Front) → F7 (new body)
    with BuildSketch(Plane.XZ):
        with BuildLine():
            ThreePointArc((484.5182852707, -123.4586215636), (496.1144740054, -62.2127694475), (500, 0))
            ThreePointArc((500, 0), (370.8099243548, 335.410196625), (50, 497.4937185533))
            Line((50, 497.4937185533), (50, 477.3887304912))
            ThreePointArc((50, 477.3887304912), (356.6510900025, 321.2475680842), (480, 0))
            ThreePointArc((480, 0), (477.0590661143, -53.053250967), (468.272302341, -105.4563931693))
            Line((468.272302341, -105.4563931693), (484.5182852707, -123.4586215636))
        make_face()
        with BuildLine():
            ThreePointArc((473.8942746161, -159.4497302791), (479.5440529439, -141.553881212), (484.5182852707, -123.4586215636))
            Line((484.5182852707, -123.4586215636), (468.272302341, -105.4563931693))
            ThreePointArc((468.272302341, -105.4563931693), (463.7127179959, -123.9778817726), (458.4208633436, -142.3035911399))
            Line((458.4208633436, -142.3035911399), (473.8942746161, -159.4497302791))
        make_face()
        with BuildLine():
            ThreePointArc((461.1917687716, -193.1376514751), (467.8463381744, -176.4080606343), (473.8942746161, -159.4497302791))
            Line((473.8942746161, -159.4497302791), (458.4208633436, -142.3035911399))
            ThreePointArc((458.4208633436, -142.3035911399), (452.692523658, -159.5916007319), (446.3124773798, -176.6498585765))
            Line((446.3124773798, -176.6498585765), (461.1917687716, -193.1376514751))
        make_face()
        with BuildLine():
            ThreePointArc((50, -497.4937185533), (297.4683344606, -401.8862898796), (461.1917687716, -193.1376514751))
            Line((461.1917687716, -193.1376514751), (446.3124773798, -176.6498585765))
            ThreePointArc((446.3124773798, -176.6498585765), (290.1594149271, -382.3709114579), (50, -477.3887304912))
            Line((50, -477.3887304912), (50, -497.4937185533))
        make_face()
        with BuildLine():
            Line((50, 477.3887304912), (50, 497.4937185533))
            ThreePointArc((50, 497.4937185533), (0, 500), (-50, 497.4937185533))
            Line((-50, 497.4937185533), (-50, 477.3887304912))
            Line((-50, 477.3887304912), (50, 477.3887304912))
        make_face()
        with BuildLine():
            Line((-50, 477.3887304912), (-50, 497.4937185533))
            ThreePointArc((-50, 497.4937185533), (-500, 0), (-50, -497.4937185533))
            Line((-50, -497.4937185533), (-50, -477.3887304912))
            ThreePointArc((-50, -477.3887304912), (-480, 0), (-50, 477.3887304912))
        make_face()
        with BuildLine():
            Line((-50, -477.3887304912), (-50, -497.4937185533))
            ThreePointArc((-50, -497.4937185533), (0, -500), (50, -497.4937185533))
            Line((50, -497.4937185533), (50, -477.3887304912))
            Line((50, -477.3887304912), (-50, -477.3887304912))
        make_face()
    extrude(amount=-F7_DEPTH)


with BuildPart() as f8:
    # F0 (on Front) → F8 (new body)
    with BuildSketch(Plane.XZ):
        Polygon((50, 0), (50, 477.3887304912), (-50, 477.3887304912), (-50, 0), (-50, -477.3887304912), (50, -477.3887304912), align=None)
        with BuildLine():
            Line((50, 477.3887304912), (50, 497.4937185533))
            ThreePointArc((50, 497.4937185533), (0, 500), (-50, 497.4937185533))
            Line((-50, 497.4937185533), (-50, 477.3887304912))
            Line((-50, 477.3887304912), (50, 477.3887304912))
        make_face()
        with BuildLine():
            Line((-50, -477.3887304912), (-50, -497.4937185533))
            ThreePointArc((-50, -497.4937185533), (0, -500), (50, -497.4937185533))
            Line((50, -497.4937185533), (50, -477.3887304912))
            Line((50, -477.3887304912), (-50, -477.3887304912))
        make_face()
    extrude(amount=F8_DEPTH)


with BuildPart() as f10:
    # F9 (on face) → F10 (new body)
    with BuildSketch(Plane.XZ):
        with BuildLine():
            ThreePointArc((223.933982822, -106.066017178), (272.5974851452, -138.5819298767), (330, -150))
            Line((330, -150), (330, -15))
            ThreePointArc((330, -15), (324.2597485145, -13.8581929877), (319.3933982822, -10.6066017178))
            Line((319.3933982822, -10.6066017178), (223.933982822, -106.066017178))
        make_face()
    extrude(amount=F10_DEPTH)


with BuildPart() as f10b:
    # F9 (on face) → F10, piece 2 (new body)
    with BuildSketch(Plane.XZ):
        with BuildLine():
            Line((319.3933982822, 10.6066017178), (223.933982822, 106.066017178))
            ThreePointArc((223.933982822, 106.066017178), (191.4180701233, 57.4025148548), (180, 0))
            Line((180, 0), (315, 0))
            ThreePointArc((315, 0), (316.1418070123, 5.7402514855), (319.3933982822, 10.6066017178))
        make_face()
    extrude(amount=F10_DEPTH)


with BuildPart() as f10c:
    # F9 (on face) → F10, piece 3 (new body)
    with BuildSketch(Plane.XZ):
        with BuildLine():
            Line((340.6066017178, 10.6066017178), (436.066017178, 106.066017178))
            ThreePointArc((436.066017178, 106.066017178), (387.4025148548, 138.5819298767), (330, 150))
            Line((330, 150), (330, 15))
            ThreePointArc((330, 15), (335.7402514855, 13.8581929877), (340.6066017178, 10.6066017178))
        make_face()
    extrude(amount=F10_DEPTH)


with BuildPart() as f10d:
    # F9 (on face) → F10, piece 4 (new body)
    with BuildSketch(Plane.XZ):
        with BuildLine():
            ThreePointArc((436.066017178, -106.066017178), (468.5819298767, -57.4025148548), (480, 0))
            Line((480, 0), (345, 0))
            ThreePointArc((345, 0), (343.8581929877, -5.7402514855), (340.6066017178, -10.6066017178))
            Line((340.6066017178, -10.6066017178), (436.066017178, -106.066017178))
        make_face()
    extrude(amount=F10_DEPTH)


with BuildPart() as f10e:
    # F9 (on face) → F10, piece 5 (new body)
    with BuildSketch(Plane.XZ):
        with BuildLine():
            Line((481.5265236423, -391.5051791271), (587.5925408203, -285.4391619491))
            Line((587.5925408203, -285.4391619491), (437.5925408203, -285.4391619491))
            ThreePointArc((437.5925408203, -285.4391619491), (449.0106109436, -342.8416768039), (481.5265236423, -391.5051791271))
        make_face()
    extrude(amount=F10_DEPTH)


with BuildPart() as f10f:
    # F9 (on face) → F10, piece 6 (new body)
    with BuildSketch(Plane.XZ):
        with BuildLine():
            Line((481.5265236423, -179.3731447712), (587.5925408203, -285.4391619491))
            Line((587.5925408203, -285.4391619491), (587.5925408203, -135.4391619491))
            ThreePointArc((587.5925408203, -135.4391619491), (530.1900259655, -146.8572320725), (481.5265236423, -179.3731447712))
        make_face()
    extrude(amount=F10_DEPTH)


with BuildPart() as f10g:
    # F9 (on face) → F10, piece 7 (new body)
    with BuildSketch(Plane.XZ):
        with BuildLine():
            Line((587.5925408203, -285.4391619491), (737.5925408203, -285.4391619491))
            ThreePointArc((737.5925408203, -285.4391619491), (726.174470697, -228.0366470944), (693.6585579983, -179.3731447712))
            Line((693.6585579983, -179.3731447712), (587.5925408203, -285.4391619491))
        make_face()
    extrude(amount=F10_DEPTH)


with BuildPart() as f10h:
    # F9 (on face) → F10, piece 8 (new body)
    with BuildSketch(Plane.XZ):
        with BuildLine():
            ThreePointArc((587.5925408203, -435.4391619491), (644.995055675, -424.0210918258), (693.6585579983, -391.5051791271))
            Line((693.6585579983, -391.5051791271), (587.5925408203, -285.4391619491))
            Line((587.5925408203, -285.4391619491), (587.5925408203, -435.4391619491))
        make_face()
    extrude(amount=F10_DEPTH)


solid = Compound([f1.part, f3.part, f3b.part, f6.part, f6b.part, f7.part, f8.part, f10.part, f10b.part, f10c.part, f10d.part, f10e.part, f10f.part, f10g.part, f10h.part])
